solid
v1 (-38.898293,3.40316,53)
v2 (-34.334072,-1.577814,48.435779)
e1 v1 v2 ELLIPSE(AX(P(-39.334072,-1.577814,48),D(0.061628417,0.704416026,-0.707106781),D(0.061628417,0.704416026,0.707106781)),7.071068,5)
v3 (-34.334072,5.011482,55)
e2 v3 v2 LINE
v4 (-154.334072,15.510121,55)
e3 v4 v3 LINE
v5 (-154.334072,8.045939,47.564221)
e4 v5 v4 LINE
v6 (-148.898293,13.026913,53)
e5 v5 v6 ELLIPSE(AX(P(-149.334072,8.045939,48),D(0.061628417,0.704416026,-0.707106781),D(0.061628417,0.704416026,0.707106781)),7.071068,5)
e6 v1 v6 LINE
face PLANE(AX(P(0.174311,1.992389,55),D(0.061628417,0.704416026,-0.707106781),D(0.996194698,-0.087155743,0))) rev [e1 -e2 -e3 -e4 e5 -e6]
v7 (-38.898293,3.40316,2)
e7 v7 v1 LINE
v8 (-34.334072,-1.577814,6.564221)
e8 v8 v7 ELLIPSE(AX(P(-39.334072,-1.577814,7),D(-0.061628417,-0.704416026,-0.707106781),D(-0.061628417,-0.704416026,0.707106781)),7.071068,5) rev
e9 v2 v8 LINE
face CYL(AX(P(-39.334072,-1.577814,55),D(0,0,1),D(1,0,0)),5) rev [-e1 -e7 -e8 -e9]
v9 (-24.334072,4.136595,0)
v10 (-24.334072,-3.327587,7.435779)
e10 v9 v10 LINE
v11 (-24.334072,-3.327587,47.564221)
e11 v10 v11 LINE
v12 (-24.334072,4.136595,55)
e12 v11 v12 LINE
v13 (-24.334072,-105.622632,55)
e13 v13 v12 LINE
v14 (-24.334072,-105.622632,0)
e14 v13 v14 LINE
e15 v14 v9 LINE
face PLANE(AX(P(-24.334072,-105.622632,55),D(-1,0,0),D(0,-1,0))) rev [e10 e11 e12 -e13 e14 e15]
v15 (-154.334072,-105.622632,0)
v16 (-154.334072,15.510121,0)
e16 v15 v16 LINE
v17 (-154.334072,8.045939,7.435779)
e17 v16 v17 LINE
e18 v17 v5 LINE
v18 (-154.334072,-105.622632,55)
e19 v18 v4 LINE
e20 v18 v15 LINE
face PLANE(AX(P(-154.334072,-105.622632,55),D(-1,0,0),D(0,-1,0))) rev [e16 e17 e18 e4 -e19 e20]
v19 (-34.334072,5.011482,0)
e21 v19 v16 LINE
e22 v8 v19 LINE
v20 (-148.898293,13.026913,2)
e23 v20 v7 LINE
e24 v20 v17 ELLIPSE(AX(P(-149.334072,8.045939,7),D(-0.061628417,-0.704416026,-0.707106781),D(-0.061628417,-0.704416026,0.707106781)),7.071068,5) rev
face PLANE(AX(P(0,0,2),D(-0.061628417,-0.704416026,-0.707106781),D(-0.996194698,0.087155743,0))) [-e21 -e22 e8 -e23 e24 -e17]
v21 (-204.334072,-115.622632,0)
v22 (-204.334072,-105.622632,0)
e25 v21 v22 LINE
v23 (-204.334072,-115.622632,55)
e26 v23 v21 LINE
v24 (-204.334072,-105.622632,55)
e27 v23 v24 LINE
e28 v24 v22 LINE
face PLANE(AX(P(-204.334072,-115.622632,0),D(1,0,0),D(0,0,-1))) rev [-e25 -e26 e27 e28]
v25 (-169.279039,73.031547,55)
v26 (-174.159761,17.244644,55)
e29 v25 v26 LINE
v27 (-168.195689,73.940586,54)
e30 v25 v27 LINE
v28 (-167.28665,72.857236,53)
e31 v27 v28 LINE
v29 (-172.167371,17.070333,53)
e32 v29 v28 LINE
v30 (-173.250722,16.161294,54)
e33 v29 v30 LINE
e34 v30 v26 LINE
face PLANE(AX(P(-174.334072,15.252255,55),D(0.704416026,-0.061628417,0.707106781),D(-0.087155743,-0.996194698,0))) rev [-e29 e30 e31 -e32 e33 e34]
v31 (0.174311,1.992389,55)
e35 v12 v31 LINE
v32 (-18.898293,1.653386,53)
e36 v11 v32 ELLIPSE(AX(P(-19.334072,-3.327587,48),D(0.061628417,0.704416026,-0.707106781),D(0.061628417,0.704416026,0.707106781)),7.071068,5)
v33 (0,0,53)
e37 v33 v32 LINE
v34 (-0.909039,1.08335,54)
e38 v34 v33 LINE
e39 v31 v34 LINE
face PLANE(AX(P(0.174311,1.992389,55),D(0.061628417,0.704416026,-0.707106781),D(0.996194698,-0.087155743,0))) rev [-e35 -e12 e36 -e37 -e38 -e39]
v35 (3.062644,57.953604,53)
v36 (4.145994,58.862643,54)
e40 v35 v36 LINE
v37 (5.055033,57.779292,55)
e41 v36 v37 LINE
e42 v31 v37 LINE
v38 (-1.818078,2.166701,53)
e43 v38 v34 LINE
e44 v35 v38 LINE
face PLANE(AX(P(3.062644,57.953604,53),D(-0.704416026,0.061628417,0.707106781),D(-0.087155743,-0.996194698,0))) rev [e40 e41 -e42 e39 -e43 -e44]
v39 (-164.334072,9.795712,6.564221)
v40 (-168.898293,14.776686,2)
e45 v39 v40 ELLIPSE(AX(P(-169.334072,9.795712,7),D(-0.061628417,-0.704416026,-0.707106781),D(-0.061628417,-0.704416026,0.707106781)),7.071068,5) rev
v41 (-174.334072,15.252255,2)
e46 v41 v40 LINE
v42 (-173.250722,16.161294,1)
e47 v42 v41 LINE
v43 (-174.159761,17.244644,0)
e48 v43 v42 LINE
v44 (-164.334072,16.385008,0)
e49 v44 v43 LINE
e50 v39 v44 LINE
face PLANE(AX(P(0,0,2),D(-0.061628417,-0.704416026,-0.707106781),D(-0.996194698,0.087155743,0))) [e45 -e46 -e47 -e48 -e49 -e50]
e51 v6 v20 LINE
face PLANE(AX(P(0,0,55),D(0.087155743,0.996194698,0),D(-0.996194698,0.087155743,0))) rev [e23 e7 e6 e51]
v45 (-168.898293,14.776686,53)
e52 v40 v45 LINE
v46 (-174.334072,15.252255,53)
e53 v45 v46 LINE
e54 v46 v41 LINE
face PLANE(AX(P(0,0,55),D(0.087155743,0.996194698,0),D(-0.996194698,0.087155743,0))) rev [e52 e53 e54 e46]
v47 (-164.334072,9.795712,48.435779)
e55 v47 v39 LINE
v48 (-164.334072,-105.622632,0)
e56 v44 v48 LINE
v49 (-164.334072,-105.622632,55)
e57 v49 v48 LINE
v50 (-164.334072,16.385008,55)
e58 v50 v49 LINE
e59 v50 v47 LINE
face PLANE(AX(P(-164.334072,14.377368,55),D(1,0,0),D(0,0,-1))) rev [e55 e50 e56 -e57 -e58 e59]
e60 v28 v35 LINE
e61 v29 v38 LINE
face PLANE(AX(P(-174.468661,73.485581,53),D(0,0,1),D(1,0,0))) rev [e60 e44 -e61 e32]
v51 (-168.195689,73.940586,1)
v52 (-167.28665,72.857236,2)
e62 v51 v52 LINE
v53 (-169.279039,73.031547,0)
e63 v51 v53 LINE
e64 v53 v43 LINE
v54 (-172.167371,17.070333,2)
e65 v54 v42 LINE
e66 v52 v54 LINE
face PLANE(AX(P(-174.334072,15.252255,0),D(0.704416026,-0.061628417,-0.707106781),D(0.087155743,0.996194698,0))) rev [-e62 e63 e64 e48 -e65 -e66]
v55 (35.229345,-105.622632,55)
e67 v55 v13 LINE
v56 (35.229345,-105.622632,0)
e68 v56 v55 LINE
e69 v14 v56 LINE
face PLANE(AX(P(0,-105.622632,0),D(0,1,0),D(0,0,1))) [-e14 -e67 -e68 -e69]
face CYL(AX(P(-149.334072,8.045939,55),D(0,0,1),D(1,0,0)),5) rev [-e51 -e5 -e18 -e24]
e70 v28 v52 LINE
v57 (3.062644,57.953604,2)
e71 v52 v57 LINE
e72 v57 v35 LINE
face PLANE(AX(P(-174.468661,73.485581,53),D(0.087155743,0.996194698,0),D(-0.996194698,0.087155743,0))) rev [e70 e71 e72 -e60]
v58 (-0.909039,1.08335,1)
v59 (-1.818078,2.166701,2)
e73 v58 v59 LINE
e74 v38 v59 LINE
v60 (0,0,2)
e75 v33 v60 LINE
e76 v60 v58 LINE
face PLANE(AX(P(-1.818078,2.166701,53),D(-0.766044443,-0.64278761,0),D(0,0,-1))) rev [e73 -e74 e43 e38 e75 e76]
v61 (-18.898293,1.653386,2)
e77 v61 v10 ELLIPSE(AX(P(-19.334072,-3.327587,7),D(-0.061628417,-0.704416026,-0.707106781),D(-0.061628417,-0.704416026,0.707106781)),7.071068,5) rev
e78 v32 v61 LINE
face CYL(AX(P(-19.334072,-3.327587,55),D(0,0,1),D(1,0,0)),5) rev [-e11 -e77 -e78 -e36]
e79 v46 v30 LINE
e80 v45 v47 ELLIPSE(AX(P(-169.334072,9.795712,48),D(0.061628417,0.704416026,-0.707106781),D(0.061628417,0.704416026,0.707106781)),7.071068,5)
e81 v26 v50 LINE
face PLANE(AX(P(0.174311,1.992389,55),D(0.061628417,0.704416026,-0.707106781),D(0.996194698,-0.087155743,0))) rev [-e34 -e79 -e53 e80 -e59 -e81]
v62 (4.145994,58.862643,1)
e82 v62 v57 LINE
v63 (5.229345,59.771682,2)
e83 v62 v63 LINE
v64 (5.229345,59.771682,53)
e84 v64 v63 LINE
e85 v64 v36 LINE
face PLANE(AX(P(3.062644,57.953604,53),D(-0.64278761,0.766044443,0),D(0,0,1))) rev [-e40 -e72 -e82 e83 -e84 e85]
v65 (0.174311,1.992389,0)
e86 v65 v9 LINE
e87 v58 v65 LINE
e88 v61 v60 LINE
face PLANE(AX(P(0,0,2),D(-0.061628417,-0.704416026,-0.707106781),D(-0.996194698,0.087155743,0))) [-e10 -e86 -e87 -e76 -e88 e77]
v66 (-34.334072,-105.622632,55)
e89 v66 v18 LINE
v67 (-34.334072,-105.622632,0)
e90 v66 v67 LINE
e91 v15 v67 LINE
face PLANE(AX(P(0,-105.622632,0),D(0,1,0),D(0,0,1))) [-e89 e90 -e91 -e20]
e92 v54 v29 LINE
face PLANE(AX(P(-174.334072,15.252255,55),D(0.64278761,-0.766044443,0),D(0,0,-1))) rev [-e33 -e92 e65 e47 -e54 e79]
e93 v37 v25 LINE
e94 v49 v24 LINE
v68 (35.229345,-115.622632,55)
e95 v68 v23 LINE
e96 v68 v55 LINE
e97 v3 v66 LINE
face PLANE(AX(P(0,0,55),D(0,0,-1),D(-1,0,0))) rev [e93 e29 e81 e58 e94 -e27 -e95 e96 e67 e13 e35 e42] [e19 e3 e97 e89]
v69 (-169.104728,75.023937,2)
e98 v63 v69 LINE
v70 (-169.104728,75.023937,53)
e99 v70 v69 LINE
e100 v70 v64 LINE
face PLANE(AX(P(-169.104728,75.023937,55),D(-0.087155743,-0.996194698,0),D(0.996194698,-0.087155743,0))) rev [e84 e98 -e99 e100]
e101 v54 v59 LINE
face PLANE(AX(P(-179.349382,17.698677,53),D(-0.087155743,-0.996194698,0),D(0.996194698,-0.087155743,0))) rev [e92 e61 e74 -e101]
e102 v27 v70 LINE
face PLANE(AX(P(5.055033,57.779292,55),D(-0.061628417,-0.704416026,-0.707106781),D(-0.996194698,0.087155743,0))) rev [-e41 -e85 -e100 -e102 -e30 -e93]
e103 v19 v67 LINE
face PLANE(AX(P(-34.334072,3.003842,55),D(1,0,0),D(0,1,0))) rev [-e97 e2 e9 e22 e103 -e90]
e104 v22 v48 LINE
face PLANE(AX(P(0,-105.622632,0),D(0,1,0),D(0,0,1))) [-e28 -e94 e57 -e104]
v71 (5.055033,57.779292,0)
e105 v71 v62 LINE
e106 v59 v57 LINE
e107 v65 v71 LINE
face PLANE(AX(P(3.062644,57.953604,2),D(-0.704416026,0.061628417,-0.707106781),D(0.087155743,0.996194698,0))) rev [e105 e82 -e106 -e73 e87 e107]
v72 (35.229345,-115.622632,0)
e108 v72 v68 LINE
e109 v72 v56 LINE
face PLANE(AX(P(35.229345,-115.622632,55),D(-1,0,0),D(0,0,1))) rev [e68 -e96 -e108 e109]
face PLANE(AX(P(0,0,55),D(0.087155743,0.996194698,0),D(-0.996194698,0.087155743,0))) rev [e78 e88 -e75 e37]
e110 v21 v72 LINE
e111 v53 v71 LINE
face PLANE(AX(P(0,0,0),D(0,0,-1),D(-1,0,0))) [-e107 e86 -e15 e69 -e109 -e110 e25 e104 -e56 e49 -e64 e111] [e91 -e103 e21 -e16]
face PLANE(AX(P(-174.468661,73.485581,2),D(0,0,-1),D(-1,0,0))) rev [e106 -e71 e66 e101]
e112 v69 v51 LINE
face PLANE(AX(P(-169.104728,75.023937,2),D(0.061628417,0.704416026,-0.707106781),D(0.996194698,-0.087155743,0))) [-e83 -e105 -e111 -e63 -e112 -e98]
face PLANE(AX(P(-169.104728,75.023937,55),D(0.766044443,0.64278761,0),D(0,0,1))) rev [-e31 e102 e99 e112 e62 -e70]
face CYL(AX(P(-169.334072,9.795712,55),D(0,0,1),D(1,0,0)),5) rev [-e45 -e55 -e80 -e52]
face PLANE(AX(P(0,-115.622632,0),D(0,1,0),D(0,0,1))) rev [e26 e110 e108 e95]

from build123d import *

# Parameters (mm, degrees)
BOSS_EXTRUDE1_DEPTH = 55
SKETCH2_W           = 51
SKETCH2_H           = 56
CUT_EXTRUDE1_DEPTH  = 198.600505619
BOSS_EXTRUDE4_DEPTH = 55
SKETCH7_W           = 239.563416731
SKETCH7_H           = 55
BOSS_EXTRUDE5_DEPTH = 10
CHAMFER6_SIZE       = 2
CHAMFER7_SIZE       = 2
FILLET4_R           = 5
FILLET5_R           = 5
FILLET6_R           = 5
FILLET7_R           = 5


# Some blends are built 0.0001 mm under size
with BuildPart() as part:
    # Sketch1 → Boss-Extrude1 (new body)
    with BuildSketch(Plane.XY):
        Polygon((0, 0), (-174.334072166, 15.252254981), (-169.104727601, 75.023936866), (5.229344565, 59.771681886), align=None)
    extrude(amount=BOSS_EXTRUDE1_DEPTH)

    # Sketch2 → Cut-Extrude1 (cut, through all)
    with BuildSketch(Plane(origin=(0, 0, 0), x_dir=(0, 0, -1), z_dir=(0.9961946980917452, -0.08715574274766201, 0))):
        with Locations((-27.5, 30)):
            Rectangle(SKETCH2_W, SKETCH2_H)
    extrude(amount=-CUT_EXTRUDE1_DEPTH, mode=Mode.SUBTRACT)

    # Sketch3 → Boss-Extrude4 (add)
    with BuildSketch(Plane.XY):
        Polygon((-164.334072166, 14.377368346), (-164.334072166, -105.622631654), (-154.334072166, -105.622631654), (-154.334072166, 13.50248171), align=None)
        Polygon((-34.334072166, 3.003842087), (-34.334072166, -105.622631654), (-24.334072166, -105.622631654), (-24.334072166, 2.128955452), align=None)
    extrude(amount=BOSS_EXTRUDE4_DEPTH)

    # Sketch7 → Boss-Extrude5 (add)
    with BuildSketch(Plane.XZ.offset(105.622631654)):
        with Locations((-84.5523638, 27.5)):
            Rectangle(SKETCH7_W, SKETCH7_H)
    extrude(amount=BOSS_EXTRUDE5_DEPTH)

    # Chamfer6
    chamfer6_edges = [part.edges().sort_by_distance(p)[0] for p in [
        (-169.279039087, 73.03154747, 27.5),
        (-171.719399884, 45.138095924, 53),
        (-174.159760681, 17.244644377, 27.5),
        (-171.719399884, 45.138095924, 2),
        (2.614672282, 29.885840943, 2),
        (5.055033079, 57.779292489, 27.5),
        (2.614672282, 29.885840943, 53),
        (0.174311485, 1.992389396, 27.5),
    ]]
    chamfer(chamfer6_edges, length=CHAMFER6_SIZE - 0.0001)  # a hair under: the kernel refuses the full size

    # Chamfer7
    # the kernel refuses this chamfer: 2 mm, written as the material it takes off along each edge
    with BuildSketch(Plane(origin=(-159.21027825, 13.929094464, 55), x_dir=(-0.0023964235484937708, -0.027391246498851614, -0.9996219169112968), z_dir=(-0.9961946980917452, 0.08715574274766169, 0))) as chamfer7_piece_1_section:
        Polygon((CHAMFER7_SIZE * 0.999621916911, -CHAMFER7_SIZE * 0.0274958766106), (-CHAMFER7_SIZE * 0.0274958766106, -CHAMFER7_SIZE * 0.999621916911), (0, 0), align=None)
    chamfer7_piece_1 = extrude(amount=20.324930327, mode=Mode.PRIVATE)
    chamfer7_piece_1 = split(chamfer7_piece_1, bisect_by=Plane(origin=(-164.334072166, 15.69707124, 54.339627198), z_dir=(-1, 0, 0)), keep=Keep.TOP, mode=Mode.PRIVATE)
    add(chamfer7_piece_1, mode=Mode.SUBTRACT)
    with BuildSketch(Plane(origin=(-29.21027825, 2.555568205, 0), x_dir=(0.08712279063524543, 0.9958180537233409, -0.02749587661058642), z_dir=(-0.9961946980917452, 0.08715574274766169, 0))) as chamfer7_piece_2_section:
        Polygon((CHAMFER7_SIZE * 0.999621916911, -CHAMFER7_SIZE * 0.0274958766106), (-CHAMFER7_SIZE * 0.0274958766106, -CHAMFER7_SIZE * 0.999621916911), (0, 0), align=None)
    chamfer7_piece_2 = extrude(amount=130.745112457, mode=Mode.PRIVATE)
    chamfer7_piece_2 = split(chamfer7_piece_2, bisect_by=Plane(origin=(-34.334072166, 8.915268669, 0.659587254), z_dir=(-1, 0, 0)), keep=Keep.TOP, mode=Mode.PRIVATE)
    chamfer7_piece_2 = split(chamfer7_piece_2, bisect_by=Plane(origin=(-154.334072166, 8.915268669, 0.659587254), z_dir=(1, 0, 0)), keep=Keep.TOP, mode=Mode.PRIVATE)
    add(chamfer7_piece_2, mode=Mode.SUBTRACT)
    with BuildSketch(Plane(origin=(5.123793916, -0.448273882, 0), x_dir=(0.08712279063524543, 0.9958180537233409, -0.027495876610586438), z_dir=(-0.9961946980917452, 0.08715574274766169, 0))) as chamfer7_piece_3_section:
        Polygon((CHAMFER7_SIZE * 0.999621916911, -CHAMFER7_SIZE * 0.0274958766106), (-CHAMFER7_SIZE * 0.0274958766106, -CHAMFER7_SIZE * 0.999621916911), (0, 0), align=None)
    chamfer7_piece_3 = extrude(amount=34.71375632, mode=Mode.PRIVATE)
    chamfer7_piece_3 = split(chamfer7_piece_3, bisect_by=Plane(origin=(-24.334072166, 1.500682903, 0.659186265), z_dir=(1, 0, 0)), keep=Keep.TOP, mode=Mode.PRIVATE)
    add(chamfer7_piece_3, mode=Mode.SUBTRACT)
    with BuildSketch(Plane(origin=(-29.21027825, 2.555568205, 55), x_dir=(0.08712279063524543, 0.9958180537233409, 0.02749587661058574), z_dir=(-0.9961946980917452, 0.08715574274766169, 0))) as chamfer7_piece_4_section:
        Polygon((CHAMFER7_SIZE * 0.999621916911, CHAMFER7_SIZE * 0.0274958766106), (-CHAMFER7_SIZE * 0.0274958766106, CHAMFER7_SIZE * 0.999621916911), (0, 0), align=None)
    chamfer7_piece_4 = extrude(amount=130.745112457, mode=Mode.PRIVATE)
    chamfer7_piece_4 = split(chamfer7_piece_4, bisect_by=Plane(origin=(-34.334072166, 8.915268669, 54.340412746), z_dir=(-1, 0, 0)), keep=Keep.TOP, mode=Mode.PRIVATE)
    chamfer7_piece_4 = split(chamfer7_piece_4, bisect_by=Plane(origin=(-154.334072166, 8.915268669, 54.340412746), z_dir=(1, 0, 0)), keep=Keep.TOP, mode=Mode.PRIVATE)
    add(chamfer7_piece_4, mode=Mode.SUBTRACT)
    with BuildSketch(Plane(origin=(5.123793916, -0.448273882, 55), x_dir=(0.08712279063524543, 0.9958180537233409, 0.02749587661058574), z_dir=(-0.9961946980917452, 0.08715574274766169, 0))) as chamfer7_piece_5_section:
        Polygon((CHAMFER7_SIZE * 0.999621916911, CHAMFER7_SIZE * 0.0274958766106), (-CHAMFER7_SIZE * 0.0274958766106, CHAMFER7_SIZE * 0.999621916911), (0, 0), align=None)
    chamfer7_piece_5 = extrude(amount=34.71375632, mode=Mode.PRIVATE)
    chamfer7_piece_5 = split(chamfer7_piece_5, bisect_by=Plane(origin=(-24.334072166, 1.500682903, 54.340813735), z_dir=(1, 0, 0)), keep=Keep.TOP, mode=Mode.PRIVATE)
    add(chamfer7_piece_5, mode=Mode.SUBTRACT)
    with BuildSketch(Plane(origin=(-159.21027825, 13.929094464, 0), x_dir=(-0.002396423548493694, -0.02739124649885074, 0.9996219169112968), z_dir=(-0.9961946980917452, 0.08715574274766169, 0))) as chamfer7_piece_6_section:
        Polygon((CHAMFER7_SIZE * 0.999621916911, CHAMFER7_SIZE * 0.0274958766106), (-CHAMFER7_SIZE * 0.0274958766106, CHAMFER7_SIZE * 0.999621916911), (0, 0), align=None)
    chamfer7_piece_6 = extrude(amount=20.324930327, mode=Mode.PRIVATE)
    chamfer7_piece_6 = split(chamfer7_piece_6, bisect_by=Plane(origin=(-164.334072166, 15.69707124, 0.660372802), z_dir=(-1, 0, 0)), keep=Keep.TOP, mode=Mode.PRIVATE)
    add(chamfer7_piece_6, mode=Mode.SUBTRACT)
    with BuildSketch(Plane(origin=(-174.228521517, 75.472210748, 0), x_dir=(-0.08712279063524556, -0.9958180537233409, -0.02749587661058637), z_dir=(0.9961946980917452, -0.08715574274766183, 0))) as chamfer7_piece_7:
        Polygon((CHAMFER7_SIZE * 0.999621916911, -CHAMFER7_SIZE * 0.0274958766106), (-CHAMFER7_SIZE * 0.0274958766106, -CHAMFER7_SIZE * 0.999621916911), (0, 0), align=None)
    extrude(amount=185.286731952, mode=Mode.SUBTRACT)
    with BuildSketch(Plane(origin=(-174.228521517, 75.472210748, 55), x_dir=(-0.08712279063524556, -0.9958180537233409, 0.02749587661058563), z_dir=(0.9961946980917452, -0.08715574274766183, 0))) as chamfer7_piece_8:
        Polygon((CHAMFER7_SIZE * 0.999621916911, CHAMFER7_SIZE * 0.0274958766106), (-CHAMFER7_SIZE * 0.0274958766106, CHAMFER7_SIZE * 0.999621916911), (0, 0), align=None)
    extrude(amount=185.286731952, mode=Mode.SUBTRACT)

    # Fillet4
    fillet4_edges = [part.edges().sort_by_distance(p)[0] for p in [
        (-24.334072166, 2.128955452, 27.5),
    ]]
    fillet(fillet4_edges, radius=FILLET4_R)

    # Fillet5
    fillet5_edges = [part.edges().sort_by_distance(p)[0] for p in [
        (-34.334072166, 3.003842087, 27.5),
    ]]
    fillet(fillet5_edges, radius=FILLET5_R)

    # Fillet6
    fillet6_edges = [part.edges().sort_by_distance(p)[0] for p in [
        (-154.334072166, 13.50248171, 27.5),
    ]]
    fillet(fillet6_edges, radius=FILLET6_R)

    # Fillet7
    fillet7_edges = [part.edges().sort_by_distance(p)[0] for p in [
        (-164.334072166, 14.377368346, 27.5),
    ]]
    fillet(fillet7_edges, radius=FILLET7_R)


solid = part.part
